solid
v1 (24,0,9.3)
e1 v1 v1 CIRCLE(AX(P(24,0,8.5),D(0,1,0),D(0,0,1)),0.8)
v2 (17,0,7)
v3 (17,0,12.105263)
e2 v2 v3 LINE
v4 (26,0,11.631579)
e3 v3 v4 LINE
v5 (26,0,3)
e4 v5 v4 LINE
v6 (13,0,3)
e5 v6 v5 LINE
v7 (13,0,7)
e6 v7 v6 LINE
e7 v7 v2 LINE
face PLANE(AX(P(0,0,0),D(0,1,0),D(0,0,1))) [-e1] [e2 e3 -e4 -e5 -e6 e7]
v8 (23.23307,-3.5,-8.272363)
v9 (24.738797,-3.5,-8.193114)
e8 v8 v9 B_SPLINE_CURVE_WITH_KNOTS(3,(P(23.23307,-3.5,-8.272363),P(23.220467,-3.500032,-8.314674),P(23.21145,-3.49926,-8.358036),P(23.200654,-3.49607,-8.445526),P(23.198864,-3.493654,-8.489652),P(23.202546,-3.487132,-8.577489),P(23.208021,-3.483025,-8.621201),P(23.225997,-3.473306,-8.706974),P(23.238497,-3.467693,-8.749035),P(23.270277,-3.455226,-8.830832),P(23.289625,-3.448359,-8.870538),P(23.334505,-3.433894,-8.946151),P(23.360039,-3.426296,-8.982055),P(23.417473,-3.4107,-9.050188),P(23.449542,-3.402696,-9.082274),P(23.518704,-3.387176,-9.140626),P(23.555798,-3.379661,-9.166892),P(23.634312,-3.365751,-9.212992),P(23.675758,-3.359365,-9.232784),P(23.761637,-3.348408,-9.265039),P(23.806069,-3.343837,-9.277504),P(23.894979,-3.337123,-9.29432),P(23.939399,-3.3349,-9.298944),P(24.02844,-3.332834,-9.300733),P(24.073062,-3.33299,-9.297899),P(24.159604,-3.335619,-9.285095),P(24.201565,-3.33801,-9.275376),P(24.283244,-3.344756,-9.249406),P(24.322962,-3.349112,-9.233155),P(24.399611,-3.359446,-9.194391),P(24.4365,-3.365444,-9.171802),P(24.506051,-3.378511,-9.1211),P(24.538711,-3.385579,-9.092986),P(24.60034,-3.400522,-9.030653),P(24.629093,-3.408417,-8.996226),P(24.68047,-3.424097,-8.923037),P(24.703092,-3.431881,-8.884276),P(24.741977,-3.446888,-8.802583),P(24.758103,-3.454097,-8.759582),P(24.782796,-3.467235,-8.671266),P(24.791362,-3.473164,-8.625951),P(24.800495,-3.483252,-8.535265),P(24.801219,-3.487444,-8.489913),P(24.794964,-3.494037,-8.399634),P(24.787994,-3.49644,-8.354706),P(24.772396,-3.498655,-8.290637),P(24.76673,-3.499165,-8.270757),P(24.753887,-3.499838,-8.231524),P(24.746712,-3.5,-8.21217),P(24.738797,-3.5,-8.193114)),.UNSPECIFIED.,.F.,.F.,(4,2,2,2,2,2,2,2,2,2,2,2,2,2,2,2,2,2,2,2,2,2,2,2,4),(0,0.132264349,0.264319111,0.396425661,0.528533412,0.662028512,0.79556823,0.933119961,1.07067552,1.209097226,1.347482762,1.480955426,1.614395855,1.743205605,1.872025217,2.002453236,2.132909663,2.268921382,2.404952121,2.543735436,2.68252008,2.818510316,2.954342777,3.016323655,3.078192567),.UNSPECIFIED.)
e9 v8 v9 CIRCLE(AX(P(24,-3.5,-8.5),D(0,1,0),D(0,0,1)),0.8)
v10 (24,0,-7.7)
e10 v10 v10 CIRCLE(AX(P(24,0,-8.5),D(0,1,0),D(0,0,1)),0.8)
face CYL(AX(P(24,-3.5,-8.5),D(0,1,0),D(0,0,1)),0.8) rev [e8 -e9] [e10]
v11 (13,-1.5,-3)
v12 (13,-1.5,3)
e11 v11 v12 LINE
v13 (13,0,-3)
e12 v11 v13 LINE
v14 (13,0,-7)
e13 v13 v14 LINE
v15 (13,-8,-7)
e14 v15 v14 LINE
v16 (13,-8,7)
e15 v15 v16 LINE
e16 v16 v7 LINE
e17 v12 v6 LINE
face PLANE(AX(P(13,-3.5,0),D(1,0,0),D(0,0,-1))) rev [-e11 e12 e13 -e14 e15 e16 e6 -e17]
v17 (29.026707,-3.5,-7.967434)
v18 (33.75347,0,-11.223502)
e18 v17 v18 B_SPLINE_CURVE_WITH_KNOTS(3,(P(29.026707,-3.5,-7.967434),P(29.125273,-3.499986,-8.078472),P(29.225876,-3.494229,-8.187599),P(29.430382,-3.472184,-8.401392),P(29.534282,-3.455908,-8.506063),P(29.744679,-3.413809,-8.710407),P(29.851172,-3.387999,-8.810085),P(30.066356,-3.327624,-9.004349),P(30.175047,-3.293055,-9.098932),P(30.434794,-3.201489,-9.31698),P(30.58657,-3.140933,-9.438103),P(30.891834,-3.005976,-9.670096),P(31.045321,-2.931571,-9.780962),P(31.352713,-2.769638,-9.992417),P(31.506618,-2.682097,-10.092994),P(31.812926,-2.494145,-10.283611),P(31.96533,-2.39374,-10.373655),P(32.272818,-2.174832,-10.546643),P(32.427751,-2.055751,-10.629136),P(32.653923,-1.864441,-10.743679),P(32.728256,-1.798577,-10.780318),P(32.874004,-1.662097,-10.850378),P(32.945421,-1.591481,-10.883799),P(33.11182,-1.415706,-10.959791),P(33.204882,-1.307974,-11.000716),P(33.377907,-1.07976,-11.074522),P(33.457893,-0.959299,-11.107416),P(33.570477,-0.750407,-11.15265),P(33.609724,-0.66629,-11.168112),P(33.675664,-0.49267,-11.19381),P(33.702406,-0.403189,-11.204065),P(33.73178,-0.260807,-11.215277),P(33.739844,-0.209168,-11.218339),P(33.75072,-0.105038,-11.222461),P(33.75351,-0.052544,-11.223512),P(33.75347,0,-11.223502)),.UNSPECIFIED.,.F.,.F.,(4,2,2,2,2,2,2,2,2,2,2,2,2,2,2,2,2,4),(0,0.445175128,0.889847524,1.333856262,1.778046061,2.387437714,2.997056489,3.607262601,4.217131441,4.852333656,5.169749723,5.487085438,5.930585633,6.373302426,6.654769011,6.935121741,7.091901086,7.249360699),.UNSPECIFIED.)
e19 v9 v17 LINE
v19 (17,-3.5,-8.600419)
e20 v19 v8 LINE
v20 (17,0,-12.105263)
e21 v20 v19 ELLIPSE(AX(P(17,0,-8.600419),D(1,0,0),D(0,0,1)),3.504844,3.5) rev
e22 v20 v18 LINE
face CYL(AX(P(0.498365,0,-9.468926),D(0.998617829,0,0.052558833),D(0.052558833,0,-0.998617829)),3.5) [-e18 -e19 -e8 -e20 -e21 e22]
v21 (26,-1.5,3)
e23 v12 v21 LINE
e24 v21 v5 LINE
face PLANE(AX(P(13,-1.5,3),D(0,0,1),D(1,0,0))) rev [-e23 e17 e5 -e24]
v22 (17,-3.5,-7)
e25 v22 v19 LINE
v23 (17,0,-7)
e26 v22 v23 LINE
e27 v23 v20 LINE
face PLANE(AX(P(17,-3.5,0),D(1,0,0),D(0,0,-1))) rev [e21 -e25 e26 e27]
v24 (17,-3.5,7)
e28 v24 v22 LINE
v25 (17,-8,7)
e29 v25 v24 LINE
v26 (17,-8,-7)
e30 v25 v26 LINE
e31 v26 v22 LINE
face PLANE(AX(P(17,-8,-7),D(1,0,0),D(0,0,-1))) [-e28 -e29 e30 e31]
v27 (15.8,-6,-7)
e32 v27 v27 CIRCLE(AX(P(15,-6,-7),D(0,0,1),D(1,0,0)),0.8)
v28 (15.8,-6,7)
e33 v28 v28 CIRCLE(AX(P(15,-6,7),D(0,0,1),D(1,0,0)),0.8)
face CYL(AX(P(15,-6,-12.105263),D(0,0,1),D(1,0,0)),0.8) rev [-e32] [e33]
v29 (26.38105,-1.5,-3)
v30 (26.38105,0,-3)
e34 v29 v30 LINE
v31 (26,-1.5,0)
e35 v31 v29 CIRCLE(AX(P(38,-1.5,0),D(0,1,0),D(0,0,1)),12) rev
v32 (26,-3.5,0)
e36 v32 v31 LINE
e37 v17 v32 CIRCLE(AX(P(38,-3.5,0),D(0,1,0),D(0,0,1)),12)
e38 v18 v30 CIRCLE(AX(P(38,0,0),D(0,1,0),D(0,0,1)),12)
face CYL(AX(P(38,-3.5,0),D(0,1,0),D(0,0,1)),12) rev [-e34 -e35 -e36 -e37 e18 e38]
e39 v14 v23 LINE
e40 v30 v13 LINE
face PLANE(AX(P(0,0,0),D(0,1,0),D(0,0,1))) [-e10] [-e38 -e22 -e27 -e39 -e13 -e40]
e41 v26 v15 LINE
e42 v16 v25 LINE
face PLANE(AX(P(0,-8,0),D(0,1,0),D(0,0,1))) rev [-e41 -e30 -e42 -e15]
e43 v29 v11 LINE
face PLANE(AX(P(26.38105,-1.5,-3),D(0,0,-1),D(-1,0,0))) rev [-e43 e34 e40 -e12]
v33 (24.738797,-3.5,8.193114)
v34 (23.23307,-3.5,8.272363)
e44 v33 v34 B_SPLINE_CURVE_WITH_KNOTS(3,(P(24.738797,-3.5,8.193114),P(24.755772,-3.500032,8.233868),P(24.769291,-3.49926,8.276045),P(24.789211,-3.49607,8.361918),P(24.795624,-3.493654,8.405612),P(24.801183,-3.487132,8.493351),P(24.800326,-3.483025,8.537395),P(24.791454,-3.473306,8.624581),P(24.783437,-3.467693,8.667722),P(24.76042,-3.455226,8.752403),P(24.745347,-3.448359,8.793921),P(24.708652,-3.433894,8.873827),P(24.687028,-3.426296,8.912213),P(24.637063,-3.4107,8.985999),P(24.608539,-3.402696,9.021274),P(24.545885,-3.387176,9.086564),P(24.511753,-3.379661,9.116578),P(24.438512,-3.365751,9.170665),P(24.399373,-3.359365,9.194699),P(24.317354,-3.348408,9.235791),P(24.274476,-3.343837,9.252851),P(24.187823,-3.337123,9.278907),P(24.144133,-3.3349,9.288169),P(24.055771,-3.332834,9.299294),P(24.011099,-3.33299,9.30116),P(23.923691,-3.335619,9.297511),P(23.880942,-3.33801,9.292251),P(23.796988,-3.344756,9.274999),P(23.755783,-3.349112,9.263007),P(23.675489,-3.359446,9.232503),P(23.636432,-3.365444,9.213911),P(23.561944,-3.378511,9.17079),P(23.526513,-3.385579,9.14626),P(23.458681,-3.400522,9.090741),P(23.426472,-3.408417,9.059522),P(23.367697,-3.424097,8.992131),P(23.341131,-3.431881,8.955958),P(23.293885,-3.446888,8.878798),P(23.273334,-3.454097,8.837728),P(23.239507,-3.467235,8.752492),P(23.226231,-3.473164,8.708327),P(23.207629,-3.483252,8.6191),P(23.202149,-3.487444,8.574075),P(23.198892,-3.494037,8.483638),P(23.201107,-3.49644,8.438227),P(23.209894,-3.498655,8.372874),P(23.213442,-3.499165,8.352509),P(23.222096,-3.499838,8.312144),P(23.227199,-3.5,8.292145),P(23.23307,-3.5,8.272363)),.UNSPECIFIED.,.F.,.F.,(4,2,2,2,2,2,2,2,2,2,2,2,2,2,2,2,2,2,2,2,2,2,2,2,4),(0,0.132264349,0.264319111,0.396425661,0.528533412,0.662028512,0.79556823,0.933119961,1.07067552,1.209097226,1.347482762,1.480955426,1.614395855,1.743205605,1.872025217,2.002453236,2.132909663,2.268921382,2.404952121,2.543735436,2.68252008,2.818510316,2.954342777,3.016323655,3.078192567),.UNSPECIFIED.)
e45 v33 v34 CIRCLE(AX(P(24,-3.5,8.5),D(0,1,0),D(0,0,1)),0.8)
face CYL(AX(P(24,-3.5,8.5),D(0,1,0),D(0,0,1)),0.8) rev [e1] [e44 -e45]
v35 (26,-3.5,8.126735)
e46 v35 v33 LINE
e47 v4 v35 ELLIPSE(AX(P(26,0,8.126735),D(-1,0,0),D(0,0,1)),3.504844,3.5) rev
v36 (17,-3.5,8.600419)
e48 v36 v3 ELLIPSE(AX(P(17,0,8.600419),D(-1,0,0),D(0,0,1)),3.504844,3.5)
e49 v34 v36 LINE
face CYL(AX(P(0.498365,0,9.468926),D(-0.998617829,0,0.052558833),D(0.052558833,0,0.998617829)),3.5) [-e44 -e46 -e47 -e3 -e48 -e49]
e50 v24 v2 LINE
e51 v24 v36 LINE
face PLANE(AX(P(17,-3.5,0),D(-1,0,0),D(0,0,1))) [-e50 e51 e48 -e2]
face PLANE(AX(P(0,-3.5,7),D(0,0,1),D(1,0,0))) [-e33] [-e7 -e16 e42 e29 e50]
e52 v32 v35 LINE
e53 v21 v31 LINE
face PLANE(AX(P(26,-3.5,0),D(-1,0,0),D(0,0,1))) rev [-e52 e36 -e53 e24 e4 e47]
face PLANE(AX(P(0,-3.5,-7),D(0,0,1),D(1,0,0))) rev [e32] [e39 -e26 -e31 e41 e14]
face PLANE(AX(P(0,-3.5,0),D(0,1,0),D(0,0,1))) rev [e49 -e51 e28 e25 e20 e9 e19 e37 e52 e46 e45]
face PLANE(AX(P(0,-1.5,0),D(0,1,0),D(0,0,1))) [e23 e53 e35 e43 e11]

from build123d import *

# Parameters (mm, degrees)
BOSS_EXTRUDE1_DEPTH = 3.5
SKETCH2_R           = 0.8
SCREW_HOLES_DEPTH   = 37.028935124
SKETCH3_W           = 4
SKETCH3_H           = 14
BOSS_EXTRUDE2_DEPTH = 8
CUT_EXTRUDE1_DEPTH  = 1.5
CUT_EXTRUDE2_START  = 13
SKETCH5_R           = 0.8
CUT_EXTRUDE2_DEPTH  = 50.74008936
FILLET1_R           = 3.5


with BuildPart() as part:
    # Sketch1 → Boss-Extrude1 (new body)
    with BuildSketch(Plane(origin=(0, 0, 0), x_dir=(1, 0, 0), z_dir=(0, 1, 0))):
        with BuildLine():
            Line((17, -10), (17, -12.105263158))
            Line((17, -12.105263158), (26, -11.631578947))
            Line((26, -11.631578947), (26, 0))
            ThreePointArc((26, 0), (28.126845638, 6.820617489), (33.753470489, 11.223501553))
            Line((33.753470489, 11.223501553), (17, 12.105263158))
            Line((17, 12.105263158), (17, 10))
            Line((17, 10), (17, 7))
            Line((17, 7), (13, 7))
            Line((13, 7), (13, 0))
            Line((13, 0), (13, -7))
            Line((13, -7), (17, -7))
            Line((17, -7), (17, -10))
        make_face()
    extrude(amount=-BOSS_EXTRUDE1_DEPTH)

    # Sketch2 → Screw Holes (cut, through all)
    with BuildSketch(Plane(origin=(0, 0, 0), x_dir=(1, 0, 0), z_dir=(0, 1, 0))):
        with Locations(Location((24, 8.5, 0), (0, 0, 270))):
            Circle(SKETCH2_R)
        with Locations(Location((24, -8.5, 0), (0, 0, 270))):
            Circle(SKETCH2_R)
    extrude(amount=-SCREW_HOLES_DEPTH, mode=Mode.SUBTRACT)

    # Sketch3 → Boss-Extrude2 (add)
    with BuildSketch(Plane(origin=(0, 0, 0), x_dir=(1, 0, 0), z_dir=(0, 1, 0))):
        with Locations((15, 0)):
            Rectangle(SKETCH3_W, SKETCH3_H)
    extrude(amount=-BOSS_EXTRUDE2_DEPTH)

    # Sketch4 → Cut-Extrude1 (cut)
    with BuildSketch(Plane(origin=(0, 0, 0), x_dir=(1, 0, 0), z_dir=(0, 1, 0))):
        Polygon((13, 0), (13, 3), (26.381049961, 3), (26.381049961, -3), (13, -3), align=None)
    extrude(amount=-CUT_EXTRUDE1_DEPTH, mode=Mode.SUBTRACT)

    # Sketch5 → Cut-Extrude2 (cut, through all)
    with BuildSketch(Plane.XY.offset(CUT_EXTRUDE2_START)):
        with Locations((15, -6)):
            Circle(SKETCH5_R)
    extrude(amount=-CUT_EXTRUDE2_DEPTH, mode=Mode.SUBTRACT)

    # Fillet1
    # the kernel refuses this fillet: 3.5 mm, written as the material it takes off along each edge
    with BuildSketch(Plane(origin=(8.262093993, -3.5, 12.565152948), x_dir=(0, 1, 0), z_dir=(0.9986178293325098, 0, -0.05255883312276359))) as fillet1_piece_1_section:
        with BuildLine():
            CenterArc((FILLET1_R, -FILLET1_R), FILLET1_R, 90, 90)
            Line((0, -FILLET1_R), (-FILLET1_R * 0.02, -FILLET1_R))
            Line((-FILLET1_R * 0.02, -FILLET1_R), (-FILLET1_R * 0.02, FILLET1_R * 0.02))
            Line((-FILLET1_R * 0.02, FILLET1_R * 0.02), (FILLET1_R, FILLET1_R * 0.02))
            Line((FILLET1_R, FILLET1_R * 0.02), (FILLET1_R, 0))
        make_face()
    fillet1_piece_1 = extrude(amount=26.512456753, mode=Mode.PRIVATE)
    fillet1_piece_1 = split(fillet1_piece_1, bisect_by=Plane(origin=(17, -2.7076171, 11.074941428), z_dir=(1, 0, 0)), keep=Keep.TOP, mode=Mode.PRIVATE)
    fillet1_piece_1 = split(fillet1_piece_1, bisect_by=Plane(origin=(26, -2.7076171, 11.074941428), z_dir=(-1, 0, 0)), keep=Keep.TOP, mode=Mode.PRIVATE)
    add(fillet1_piece_1, mode=Mode.SUBTRACT)
    with BuildSketch(Plane(origin=(42.491376496, -3.5, -10.763611763), x_dir=(-0.05255883312276374, 0, 0.9986178293325098), z_dir=(-0.9986178293325098, 0, -0.05255883312276374))) as fillet1_piece_2_section:
        with BuildLine():
            CenterArc((FILLET1_R, FILLET1_R), FILLET1_R, 180, 90)
            Line((0, FILLET1_R), (-FILLET1_R * 0.02, FILLET1_R))
            Line((-FILLET1_R * 0.02, FILLET1_R), (-FILLET1_R * 0.02, -FILLET1_R * 0.02))
            Line((-FILLET1_R * 0.02, -FILLET1_R * 0.02), (FILLET1_R, -FILLET1_R * 0.02))
            Line((FILLET1_R, -FILLET1_R * 0.02), (FILLET1_R, 0))
        make_face()
    fillet1_piece_2 = extrude(amount=34.276658695, mode=Mode.PRIVATE)
    fillet1_piece_2 = split(fillet1_piece_2, bisect_by=Plane(origin=(17, -2.672351217, -10.961883327), z_dir=(1, 0, 0)), keep=Keep.TOP, mode=Mode.PRIVATE)
    fillet1_piece_2 = fillet1_piece_2 - Plane(origin=(38, -2.672351217, 0), x_dir=(-1, 0, 0), z_dir=(0, 1, 0)) * Cylinder(12, 83, mode=Mode.PRIVATE)
    add(fillet1_piece_2, mode=Mode.SUBTRACT)


solid = part.part
